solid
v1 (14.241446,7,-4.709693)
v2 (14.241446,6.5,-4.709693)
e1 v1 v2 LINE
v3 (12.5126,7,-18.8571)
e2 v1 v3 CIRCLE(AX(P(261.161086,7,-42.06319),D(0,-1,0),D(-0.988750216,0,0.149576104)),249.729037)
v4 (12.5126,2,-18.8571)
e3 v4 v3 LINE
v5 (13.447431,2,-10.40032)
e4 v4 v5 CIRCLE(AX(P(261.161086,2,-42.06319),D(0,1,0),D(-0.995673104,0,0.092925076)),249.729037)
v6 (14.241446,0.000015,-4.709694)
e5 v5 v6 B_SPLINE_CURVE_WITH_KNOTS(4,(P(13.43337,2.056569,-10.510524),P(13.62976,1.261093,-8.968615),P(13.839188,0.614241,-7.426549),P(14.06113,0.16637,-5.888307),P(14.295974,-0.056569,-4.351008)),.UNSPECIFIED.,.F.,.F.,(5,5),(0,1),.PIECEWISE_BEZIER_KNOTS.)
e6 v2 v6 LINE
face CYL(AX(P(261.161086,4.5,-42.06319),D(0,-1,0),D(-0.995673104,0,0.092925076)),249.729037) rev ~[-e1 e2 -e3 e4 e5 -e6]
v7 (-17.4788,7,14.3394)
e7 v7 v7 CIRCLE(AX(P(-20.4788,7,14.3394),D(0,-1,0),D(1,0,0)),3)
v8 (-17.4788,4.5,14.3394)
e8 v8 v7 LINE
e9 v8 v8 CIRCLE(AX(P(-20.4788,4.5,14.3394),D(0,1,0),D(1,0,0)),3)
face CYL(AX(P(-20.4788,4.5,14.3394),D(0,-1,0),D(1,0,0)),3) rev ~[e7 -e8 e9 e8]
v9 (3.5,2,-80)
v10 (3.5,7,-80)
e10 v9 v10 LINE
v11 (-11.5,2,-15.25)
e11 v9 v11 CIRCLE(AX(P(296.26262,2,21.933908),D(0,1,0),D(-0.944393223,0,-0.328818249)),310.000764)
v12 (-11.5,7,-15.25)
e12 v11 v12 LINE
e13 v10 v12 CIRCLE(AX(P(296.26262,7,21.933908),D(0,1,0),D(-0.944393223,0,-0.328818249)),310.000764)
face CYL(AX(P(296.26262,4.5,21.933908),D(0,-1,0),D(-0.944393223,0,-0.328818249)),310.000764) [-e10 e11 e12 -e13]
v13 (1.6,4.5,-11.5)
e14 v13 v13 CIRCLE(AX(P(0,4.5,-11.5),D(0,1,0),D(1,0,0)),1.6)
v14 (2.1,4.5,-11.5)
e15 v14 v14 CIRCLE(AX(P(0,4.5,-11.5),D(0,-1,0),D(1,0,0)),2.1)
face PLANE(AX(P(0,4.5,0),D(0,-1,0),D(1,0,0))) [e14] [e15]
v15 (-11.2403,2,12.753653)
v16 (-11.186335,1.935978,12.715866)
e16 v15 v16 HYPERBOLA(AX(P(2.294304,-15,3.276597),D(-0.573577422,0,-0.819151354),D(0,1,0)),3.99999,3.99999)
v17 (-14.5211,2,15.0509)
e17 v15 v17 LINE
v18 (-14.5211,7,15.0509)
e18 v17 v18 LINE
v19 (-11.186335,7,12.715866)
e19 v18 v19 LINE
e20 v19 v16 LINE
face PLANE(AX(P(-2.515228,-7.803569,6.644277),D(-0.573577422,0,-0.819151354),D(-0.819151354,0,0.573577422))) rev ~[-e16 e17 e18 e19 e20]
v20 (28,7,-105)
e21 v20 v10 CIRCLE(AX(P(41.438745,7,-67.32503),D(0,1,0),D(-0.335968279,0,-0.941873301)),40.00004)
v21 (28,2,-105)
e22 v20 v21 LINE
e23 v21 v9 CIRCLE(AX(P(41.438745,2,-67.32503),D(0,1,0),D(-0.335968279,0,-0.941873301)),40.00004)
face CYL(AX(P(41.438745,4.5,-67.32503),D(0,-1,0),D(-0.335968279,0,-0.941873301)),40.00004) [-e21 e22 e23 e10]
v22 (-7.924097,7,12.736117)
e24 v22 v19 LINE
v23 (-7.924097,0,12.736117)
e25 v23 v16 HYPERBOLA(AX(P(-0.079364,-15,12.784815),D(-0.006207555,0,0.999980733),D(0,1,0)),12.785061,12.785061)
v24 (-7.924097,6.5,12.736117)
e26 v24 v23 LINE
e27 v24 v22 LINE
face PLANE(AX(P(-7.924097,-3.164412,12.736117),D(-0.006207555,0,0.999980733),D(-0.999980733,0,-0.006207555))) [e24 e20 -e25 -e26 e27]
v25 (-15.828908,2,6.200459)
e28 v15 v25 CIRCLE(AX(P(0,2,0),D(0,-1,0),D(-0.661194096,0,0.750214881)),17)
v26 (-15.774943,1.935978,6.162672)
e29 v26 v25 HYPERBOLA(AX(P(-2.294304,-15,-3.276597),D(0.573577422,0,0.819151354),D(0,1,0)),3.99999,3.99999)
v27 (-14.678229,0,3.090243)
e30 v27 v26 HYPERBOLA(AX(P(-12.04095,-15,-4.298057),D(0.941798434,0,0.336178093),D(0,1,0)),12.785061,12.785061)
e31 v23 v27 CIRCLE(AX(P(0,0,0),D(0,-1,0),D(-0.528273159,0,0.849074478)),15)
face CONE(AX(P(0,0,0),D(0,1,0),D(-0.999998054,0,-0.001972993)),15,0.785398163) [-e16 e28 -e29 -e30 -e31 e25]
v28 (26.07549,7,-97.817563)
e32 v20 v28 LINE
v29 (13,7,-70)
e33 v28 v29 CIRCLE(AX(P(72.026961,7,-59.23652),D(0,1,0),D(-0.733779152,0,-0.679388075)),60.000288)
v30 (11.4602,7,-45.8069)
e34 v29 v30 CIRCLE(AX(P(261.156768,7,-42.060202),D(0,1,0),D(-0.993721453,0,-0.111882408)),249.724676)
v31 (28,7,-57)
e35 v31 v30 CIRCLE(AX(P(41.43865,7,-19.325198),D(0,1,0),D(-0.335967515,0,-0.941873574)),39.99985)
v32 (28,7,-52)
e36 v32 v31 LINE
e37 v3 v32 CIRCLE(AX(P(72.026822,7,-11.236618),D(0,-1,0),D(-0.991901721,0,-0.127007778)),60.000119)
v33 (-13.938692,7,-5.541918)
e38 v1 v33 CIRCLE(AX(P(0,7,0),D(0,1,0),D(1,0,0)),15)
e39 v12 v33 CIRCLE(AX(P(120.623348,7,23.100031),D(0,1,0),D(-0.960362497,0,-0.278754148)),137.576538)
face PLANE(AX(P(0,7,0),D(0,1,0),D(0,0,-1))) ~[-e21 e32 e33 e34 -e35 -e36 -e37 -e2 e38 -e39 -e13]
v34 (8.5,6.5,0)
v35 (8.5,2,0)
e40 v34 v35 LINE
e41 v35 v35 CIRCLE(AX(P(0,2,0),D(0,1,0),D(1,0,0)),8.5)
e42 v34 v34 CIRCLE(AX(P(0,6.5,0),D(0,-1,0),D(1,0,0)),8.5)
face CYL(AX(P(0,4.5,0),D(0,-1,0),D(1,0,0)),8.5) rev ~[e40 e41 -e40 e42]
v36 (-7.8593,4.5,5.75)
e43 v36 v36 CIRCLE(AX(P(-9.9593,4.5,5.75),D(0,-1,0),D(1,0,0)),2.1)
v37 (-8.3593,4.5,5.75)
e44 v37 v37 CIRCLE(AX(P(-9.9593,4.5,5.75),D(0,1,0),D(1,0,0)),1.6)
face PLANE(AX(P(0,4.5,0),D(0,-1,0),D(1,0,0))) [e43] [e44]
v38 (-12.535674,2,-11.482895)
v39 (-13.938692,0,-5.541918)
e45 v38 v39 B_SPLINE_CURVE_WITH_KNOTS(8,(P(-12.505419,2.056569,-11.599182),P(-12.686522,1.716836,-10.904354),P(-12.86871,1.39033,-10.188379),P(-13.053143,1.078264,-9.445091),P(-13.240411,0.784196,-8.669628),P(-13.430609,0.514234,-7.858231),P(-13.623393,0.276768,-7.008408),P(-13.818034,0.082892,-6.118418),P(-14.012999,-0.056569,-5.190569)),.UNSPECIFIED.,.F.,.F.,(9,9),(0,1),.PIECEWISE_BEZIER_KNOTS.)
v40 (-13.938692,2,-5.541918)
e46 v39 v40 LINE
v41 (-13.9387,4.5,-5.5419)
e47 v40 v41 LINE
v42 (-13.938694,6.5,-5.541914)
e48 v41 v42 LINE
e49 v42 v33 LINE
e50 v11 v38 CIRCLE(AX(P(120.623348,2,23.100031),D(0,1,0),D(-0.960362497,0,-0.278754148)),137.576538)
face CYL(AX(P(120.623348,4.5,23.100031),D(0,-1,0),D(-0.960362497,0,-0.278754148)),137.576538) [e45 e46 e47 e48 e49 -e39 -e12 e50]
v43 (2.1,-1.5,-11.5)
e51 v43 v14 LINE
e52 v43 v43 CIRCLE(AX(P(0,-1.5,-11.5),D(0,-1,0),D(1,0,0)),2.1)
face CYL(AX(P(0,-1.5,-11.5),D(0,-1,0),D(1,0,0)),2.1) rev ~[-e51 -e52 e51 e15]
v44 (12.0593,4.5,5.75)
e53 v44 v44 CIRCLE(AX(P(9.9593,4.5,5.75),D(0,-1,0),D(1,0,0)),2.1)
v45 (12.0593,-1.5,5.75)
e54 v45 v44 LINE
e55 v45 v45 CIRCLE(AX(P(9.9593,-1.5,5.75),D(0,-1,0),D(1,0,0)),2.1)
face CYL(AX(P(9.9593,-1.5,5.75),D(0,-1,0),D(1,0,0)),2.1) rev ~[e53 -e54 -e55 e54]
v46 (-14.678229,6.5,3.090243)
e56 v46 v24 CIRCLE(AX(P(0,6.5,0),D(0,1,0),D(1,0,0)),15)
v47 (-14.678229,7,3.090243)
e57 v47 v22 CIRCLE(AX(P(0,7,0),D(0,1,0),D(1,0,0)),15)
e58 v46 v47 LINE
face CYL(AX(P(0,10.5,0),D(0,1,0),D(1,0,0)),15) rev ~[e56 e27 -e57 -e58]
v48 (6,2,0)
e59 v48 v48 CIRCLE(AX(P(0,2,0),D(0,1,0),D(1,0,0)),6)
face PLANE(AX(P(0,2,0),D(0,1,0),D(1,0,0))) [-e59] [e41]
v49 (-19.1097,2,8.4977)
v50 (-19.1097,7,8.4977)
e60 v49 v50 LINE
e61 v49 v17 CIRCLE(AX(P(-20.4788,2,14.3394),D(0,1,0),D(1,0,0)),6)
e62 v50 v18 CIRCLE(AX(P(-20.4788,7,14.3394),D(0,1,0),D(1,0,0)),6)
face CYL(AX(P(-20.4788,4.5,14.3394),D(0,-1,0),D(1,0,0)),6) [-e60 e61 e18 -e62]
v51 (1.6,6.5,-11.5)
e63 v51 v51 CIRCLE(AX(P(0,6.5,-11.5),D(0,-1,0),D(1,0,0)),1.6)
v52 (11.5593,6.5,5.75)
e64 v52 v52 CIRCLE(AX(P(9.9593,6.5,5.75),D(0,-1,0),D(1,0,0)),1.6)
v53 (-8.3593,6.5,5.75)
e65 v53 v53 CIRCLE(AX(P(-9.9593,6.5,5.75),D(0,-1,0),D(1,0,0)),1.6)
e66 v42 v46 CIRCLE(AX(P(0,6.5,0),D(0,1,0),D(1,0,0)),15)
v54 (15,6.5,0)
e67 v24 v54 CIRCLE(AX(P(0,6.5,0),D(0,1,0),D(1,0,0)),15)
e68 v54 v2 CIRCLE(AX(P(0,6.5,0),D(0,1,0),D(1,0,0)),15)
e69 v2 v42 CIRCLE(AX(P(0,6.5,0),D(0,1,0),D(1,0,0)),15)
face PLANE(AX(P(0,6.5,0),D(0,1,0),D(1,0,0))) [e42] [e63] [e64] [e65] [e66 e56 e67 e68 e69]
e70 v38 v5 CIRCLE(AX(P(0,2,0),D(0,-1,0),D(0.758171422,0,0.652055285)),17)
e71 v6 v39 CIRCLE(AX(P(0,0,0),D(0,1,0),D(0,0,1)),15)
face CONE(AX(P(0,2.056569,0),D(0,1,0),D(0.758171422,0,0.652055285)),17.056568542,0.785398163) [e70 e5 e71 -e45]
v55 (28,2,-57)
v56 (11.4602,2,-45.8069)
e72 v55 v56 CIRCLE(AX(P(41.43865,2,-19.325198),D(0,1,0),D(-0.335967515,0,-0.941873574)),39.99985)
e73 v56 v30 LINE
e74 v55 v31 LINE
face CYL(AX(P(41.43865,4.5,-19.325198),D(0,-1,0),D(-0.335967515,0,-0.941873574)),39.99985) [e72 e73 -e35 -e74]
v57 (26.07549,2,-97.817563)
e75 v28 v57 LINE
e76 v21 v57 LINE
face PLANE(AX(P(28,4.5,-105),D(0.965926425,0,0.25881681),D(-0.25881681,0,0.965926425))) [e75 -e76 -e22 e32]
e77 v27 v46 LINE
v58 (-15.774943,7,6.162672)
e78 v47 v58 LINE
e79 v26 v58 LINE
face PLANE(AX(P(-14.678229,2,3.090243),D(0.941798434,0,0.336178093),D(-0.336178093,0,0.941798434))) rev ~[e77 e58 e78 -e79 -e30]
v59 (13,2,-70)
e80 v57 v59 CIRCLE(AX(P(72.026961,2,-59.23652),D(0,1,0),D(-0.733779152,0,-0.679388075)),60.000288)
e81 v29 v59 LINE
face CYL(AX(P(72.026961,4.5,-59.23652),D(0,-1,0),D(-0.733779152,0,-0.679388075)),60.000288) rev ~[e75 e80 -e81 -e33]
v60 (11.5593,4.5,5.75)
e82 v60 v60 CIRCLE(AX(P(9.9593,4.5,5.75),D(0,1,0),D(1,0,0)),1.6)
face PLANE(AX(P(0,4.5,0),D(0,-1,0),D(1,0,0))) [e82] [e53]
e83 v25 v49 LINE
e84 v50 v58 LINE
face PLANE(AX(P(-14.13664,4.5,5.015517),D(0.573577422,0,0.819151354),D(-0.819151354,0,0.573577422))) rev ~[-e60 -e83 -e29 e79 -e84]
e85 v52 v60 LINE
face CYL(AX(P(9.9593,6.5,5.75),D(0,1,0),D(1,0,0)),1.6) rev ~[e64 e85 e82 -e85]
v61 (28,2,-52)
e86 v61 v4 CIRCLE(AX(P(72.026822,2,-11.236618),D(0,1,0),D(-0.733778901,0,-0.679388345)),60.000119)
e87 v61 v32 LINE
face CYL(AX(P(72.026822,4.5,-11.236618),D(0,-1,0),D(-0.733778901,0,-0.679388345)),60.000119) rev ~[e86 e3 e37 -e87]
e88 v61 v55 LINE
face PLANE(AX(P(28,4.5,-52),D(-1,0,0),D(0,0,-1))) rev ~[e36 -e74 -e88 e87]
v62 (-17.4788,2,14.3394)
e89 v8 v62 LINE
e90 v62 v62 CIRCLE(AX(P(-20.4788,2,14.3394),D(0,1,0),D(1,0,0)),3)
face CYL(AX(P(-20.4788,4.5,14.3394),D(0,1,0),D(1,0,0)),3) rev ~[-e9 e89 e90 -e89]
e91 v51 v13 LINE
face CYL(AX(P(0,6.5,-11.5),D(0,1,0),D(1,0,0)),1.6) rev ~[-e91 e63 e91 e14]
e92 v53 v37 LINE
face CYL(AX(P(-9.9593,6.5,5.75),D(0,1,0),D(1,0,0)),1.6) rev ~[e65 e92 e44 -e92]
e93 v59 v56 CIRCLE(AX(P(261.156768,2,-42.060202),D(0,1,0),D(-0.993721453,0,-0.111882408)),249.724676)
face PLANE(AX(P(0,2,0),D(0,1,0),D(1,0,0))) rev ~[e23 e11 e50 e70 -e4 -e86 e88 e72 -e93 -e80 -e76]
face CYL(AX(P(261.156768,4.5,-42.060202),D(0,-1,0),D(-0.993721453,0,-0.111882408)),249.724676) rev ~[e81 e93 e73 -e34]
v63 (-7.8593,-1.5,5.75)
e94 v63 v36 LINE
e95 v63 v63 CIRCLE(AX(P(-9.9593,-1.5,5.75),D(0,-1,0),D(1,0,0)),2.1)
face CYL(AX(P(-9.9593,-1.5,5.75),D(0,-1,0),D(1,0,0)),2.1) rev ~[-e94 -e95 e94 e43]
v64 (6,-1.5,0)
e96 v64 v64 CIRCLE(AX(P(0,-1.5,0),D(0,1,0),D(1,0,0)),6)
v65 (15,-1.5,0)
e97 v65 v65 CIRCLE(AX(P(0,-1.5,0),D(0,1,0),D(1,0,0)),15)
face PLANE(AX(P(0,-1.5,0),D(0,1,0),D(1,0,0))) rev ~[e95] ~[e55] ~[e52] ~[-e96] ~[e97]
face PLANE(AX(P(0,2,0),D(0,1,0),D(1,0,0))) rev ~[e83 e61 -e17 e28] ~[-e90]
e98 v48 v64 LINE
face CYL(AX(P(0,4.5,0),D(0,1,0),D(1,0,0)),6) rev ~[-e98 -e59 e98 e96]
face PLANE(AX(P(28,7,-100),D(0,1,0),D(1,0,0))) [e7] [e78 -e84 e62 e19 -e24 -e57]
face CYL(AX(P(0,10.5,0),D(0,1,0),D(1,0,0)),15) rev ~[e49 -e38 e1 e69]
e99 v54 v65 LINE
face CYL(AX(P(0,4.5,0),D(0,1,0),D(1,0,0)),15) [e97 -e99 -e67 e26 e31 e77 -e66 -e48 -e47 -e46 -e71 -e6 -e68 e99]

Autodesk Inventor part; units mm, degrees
sketch "Skizze10" plane through (0, 0, 0) normal (1, 0, 0) x (0, 1, 0)
  line L0 (-1.4, 0) -> (8.4, 0) projected
  line L1 (0, -13.2) -> (0, 2.2) projected
  line L2 (2, -2.5) -> (7, -2.5)
  line L3 (7, -2.5) -> (7, -8)
  line L4 (7, -8) -> (2, -8)
  line L5 (2, -8) -> (2, -2.5)
  point P0 (0, 0)
  point P1 (0, -11)
  dimension "d135" = 8
  dimension "d137" = 5
  dimension "d138" = 2
  dimension "d145" = 2.5
revolve "Umdrehung2" add sketch "Skizze10" angle 360 about axis through (0, -10, 0) along (0, 1, 0)
ref_plane "Arbeitsebene2" through (0, 6, 0) normal (0, 1, 0) x (1, 0, 0)
ref_plane "Arbeitsebene3" through (0, 4.5, 0) normal (0, 1, 0) x (1, 0, 0)
sketch "Skizze12" plane through (0, 4.5, 0) normal (0, 1, 0) x (1, 0, 0)
  arc A0 (3.5, 80) -> (-11.5, 15.25) centre (296.2619, -21.9337) ccw projected
  arc A1 (28, 100) -> (13, 70) centre (72.0267, 59.2367) ccw projected
  line L0 (28, 100) -> (28, 105) projected
  arc A2 (28, 105) -> (3.5, 80) centre (41.4387, 67.3251) ccw projected
  circle A3 centre (0, 0) radius 15
  arc A4 (-11.5, 15.25) -> (-15, 0) centre (120.624, -23.1002) ccw
  circle A5 centre (0, 0) radius 8 projected
  line L1 (0, 0) -> (-20.4788, -14.3394)
  line L2 (-78.9324, 0) -> (358.7942, 0) projected
  line L3 (0, 133.8507) -> (0, -48.3491) projected
  circle A6 centre (-20.4788, -14.3394) radius 6
  circle A7 centre (-20.4788, -14.3394) radius 3
  line L4 (2.2943, -3.2766) -> (-14.5211, -15.0509)
  line L5 (-2.2943, 3.2766) -> (-19.1097, -8.4977)
  arc A8 (28, 52) -> (12.5126, 18.8571) centre (72.0267, 11.2367) ccw
  line L6 (28, 52) -> (28, 57)
  arc A9 (28, 57) -> (11.4602, 45.8069) centre (41.4387, 19.3251) ccw
  arc A10 (13, 70) -> (11.4602, 45.8069) centre (261.1443, 42.0613) ccw
  arc A11 (12.5126, 18.8571) -> (15, 0) centre (261.1443, 42.0613) ccw
  line L7 (28, 105) -> (24.0256, 90.1672)
  point P0 (-16.4, 0)
  point P1 (-14.1366, -5.0155)
  point P2 (-10.4814, -11.4821)
  point P3 (-7.2048, -13.7764)
  point P4 (-9.548, -11.5687)
  point P5 (28, 54.5)
  point P6 (28, 102.5)
  point P7 (-13.9387, 5.5419)
  point P8 (14.2414, 4.7098)
  point P9 (26.0755, 97.8175)
  dimension "d147" = 30
  dimension "d148" = 55
  dimension "d149" = 25
  dimension "d150" = 12
  dimension "d152" = 3
  dimension "d153" = 4
  dimension "d154" = 4
  dimension "d221" = 57
  dimension "d222" = 15
sketch "Skizze13" plane through (0, 4.5, 0) normal (0, 1, 0) x (1, 0, 0)
  point P0 (0, 0)
extrude "Extrusion8" add sketch "Skizze12" along normal mid plane 5 contours A2 L7 A1 A10 A9 L6 A8 A11 A3 L3 A0 | L3 A3 A4 A0 | L3 A5 L2 A4 A3 | A3 A11 L2 A5 L3 | A4 A3 | A3 A11 | L3 L2 A5 | A5 L2 L3 | L2 A5 L5 A3 | A3 L3 A5 L2 | A5 L3 L2 | L2 L5 A5 | L3 L4 A5 L1 | L1 A5 L5 L2 | L5 A5 L1 A3 | A3 L1 A6 L5 | A3 L4 A5 L3 | A5 L4 L3 | A5 L4 A3 L1 | A3 L4 A6 L1 | A6
sketch "Skizze15" plane through (0, 4.5, 0) normal (0, 1, 0) x (1, 0, 0)
  arc A0 (-11.5, 15.25) -> (-13.9387, 5.5419) centre (120.624, -23.1002) ccw projected
  circle A1 centre (0, 0) radius 15
  point P0 (-15, 0)
extrude "Extrusion10" add sketch "Skizze15" along normal mid plane 12
sketch "Skizze16" plane through (0, 4.5, 0) normal (0, 1, 0) x (1, 0, 0)
  circle A0 centre (0, 0) radius 6
  dimension "d162" = 12
extrude "Extrusion11" cut sketch "Skizze16" along normal mid plane 12
sketch "Skizze17" plane through (0, 4.5, 0) normal (0, 1, 0) x (1, 0, 0)
  circle A0 centre (0, 0) radius 8.5
  dimension "d165" = 17
extrude "Extrusion12" cut sketch "Skizze17" along normal mid plane 5
chamfer "Fasen7" distance 2 angle 45 8 edges at (-12.2873, 7, 8.6036) (-9.548, 3.25, 11.5687) (-9.548, 5.75, 11.5687) (-12.2873, 2, 8.6036) (0.4428, 2, -14.9935) (0.4428, 7, -14.9935) (-14.1366, 5.75, 5.0155) (-14.1366, 3.25, 5.0155)
ref_plane "Arbeitsebene4" through (0, 4.5, 0) normal (0, 1, 0) x (1, 0, 0)
sketch "Skizze21" plane through (0, 10.5, 0) normal (0, 1, 0) x (1, 0, 0)
  circle A0 centre (0, 0) radius 15
  dimension "d200" = 30
extrude "Extrusion16" cut sketch "Skizze21" against normal blind 4
sketch "Skizze23" plane through (0, 6.5, 0) normal (0, 1, 0) x (1, 0, 0)
  line L0 (-37.3746, 0) -> (38.8958, 0) projected
  line L1 (0, 130.102) -> (0, -45.6119) projected
  line L2 (0, 0) -> (0, 20.1991)
  line L3 (0, 0) -> (-17.4929, -10.0995)
  line L4 (0, 0) -> (17.4929, -10.0995)
  circle A0 centre (0, 0) radius 8.5 projected
  arc A1 (14.2414, 4.7098) -> (-13.9387, 5.5419) centre (0, 0) ccw projected
  circle A2 centre (0, 0) radius 11.5
  circle A3 centre (-9.9593, -5.75) radius 1.6
  circle A4 centre (9.9593, -5.75) radius 1.6
  circle A5 centre (0, 11.5) radius 1.6
  arc A6 (-13.9387, 5.5419) -> (-14.6782, -3.0902) centre (0, 0) ccw projected
  arc A7 (-7.9241, -12.7361) -> (14.2414, 4.7098) centre (0, 0) ccw projected
  arc A8 (-14.6782, -3.0902) -> (-7.9241, -12.7361) centre (0, 0) ccw projected
  dimension "d203" = 360
  dimension "d205" = 3
  dimension "d206" = 3.2
  dimension "d207" = 3.2
  dimension "d208" = 3.2
  dimension "d216" = 23
  dimension "d217" = 120
extrude "Extrusion17" cut sketch "Skizze23" against normal blind 8 contours A5 A2 L1 | L1 A2 A5 | A3 A2 L3 | L3 A2 A3 | A4 A2 L4 | L4 A2 A4 | A2 L1 A5 | A4 L4 A2 | A5 L1 A2 | A2 L3 A3 | A3 L3 A2 | A2 L4 A4
sketch "Skizze24" plane through (0, -1.5, 0) normal (0, -1, 0) x (1, 0, 0)
  circle A0 centre (0, -11.5) radius 1.6 projected
  circle A1 centre (9.9593, 5.75) radius 1.6 projected
  circle A2 centre (-9.9593, 5.75) radius 1.6 projected
  circle A3 centre (0, 0) radius 6 projected
  circle A4 centre (0, 0) radius 15 projected
  dimension "d211" = 12
  dimension "d212" = 30
  dimension "d213" = 11.5
sketch "Skizze25" plane through (28, 7, -100) normal (0, 1, 0) x (1, 0, 0)
  line L0 (-56.3412, -125.0488) -> (1.0248, -125.0488)
  line L1 (1.0248, -125.0488) -> (1.0248, -72.2498)
  line L2 (1.0248, -72.2498) -> (-56.3412, -72.2498)
  line L3 (-56.3412, -72.2498) -> (-56.3412, -125.0488)
extrude "Extrusion18" cut sketch "Skizze25" along normal blind 10
sketch "Skizze26" plane through (0, -1.5, 0) normal (0, -1, 0) x (1, 0, 0)
  circle A0 centre (0, -11.5) radius 1.6 projected
  circle A1 centre (9.9593, 5.75) radius 1.6 projected
  circle A2 centre (-9.9593, 5.75) radius 1.6 projected
  circle A3 centre (-9.9593, 5.75) radius 2.1
  circle A4 centre (9.9593, 5.75) radius 2.1
  circle A5 centre (0, -11.5) radius 2.1
  dimension "d223" = 4.2
  dimension "d224" = 4.2
  dimension "d225" = 4.2
extrude "Extrusion19" cut sketch "Skizze26" against normal blind 6 contours A0 | A1 | A2 | A3 | A4 | A5
properties part number "01-03-01 Zange links nue" material "Phenolharz"
